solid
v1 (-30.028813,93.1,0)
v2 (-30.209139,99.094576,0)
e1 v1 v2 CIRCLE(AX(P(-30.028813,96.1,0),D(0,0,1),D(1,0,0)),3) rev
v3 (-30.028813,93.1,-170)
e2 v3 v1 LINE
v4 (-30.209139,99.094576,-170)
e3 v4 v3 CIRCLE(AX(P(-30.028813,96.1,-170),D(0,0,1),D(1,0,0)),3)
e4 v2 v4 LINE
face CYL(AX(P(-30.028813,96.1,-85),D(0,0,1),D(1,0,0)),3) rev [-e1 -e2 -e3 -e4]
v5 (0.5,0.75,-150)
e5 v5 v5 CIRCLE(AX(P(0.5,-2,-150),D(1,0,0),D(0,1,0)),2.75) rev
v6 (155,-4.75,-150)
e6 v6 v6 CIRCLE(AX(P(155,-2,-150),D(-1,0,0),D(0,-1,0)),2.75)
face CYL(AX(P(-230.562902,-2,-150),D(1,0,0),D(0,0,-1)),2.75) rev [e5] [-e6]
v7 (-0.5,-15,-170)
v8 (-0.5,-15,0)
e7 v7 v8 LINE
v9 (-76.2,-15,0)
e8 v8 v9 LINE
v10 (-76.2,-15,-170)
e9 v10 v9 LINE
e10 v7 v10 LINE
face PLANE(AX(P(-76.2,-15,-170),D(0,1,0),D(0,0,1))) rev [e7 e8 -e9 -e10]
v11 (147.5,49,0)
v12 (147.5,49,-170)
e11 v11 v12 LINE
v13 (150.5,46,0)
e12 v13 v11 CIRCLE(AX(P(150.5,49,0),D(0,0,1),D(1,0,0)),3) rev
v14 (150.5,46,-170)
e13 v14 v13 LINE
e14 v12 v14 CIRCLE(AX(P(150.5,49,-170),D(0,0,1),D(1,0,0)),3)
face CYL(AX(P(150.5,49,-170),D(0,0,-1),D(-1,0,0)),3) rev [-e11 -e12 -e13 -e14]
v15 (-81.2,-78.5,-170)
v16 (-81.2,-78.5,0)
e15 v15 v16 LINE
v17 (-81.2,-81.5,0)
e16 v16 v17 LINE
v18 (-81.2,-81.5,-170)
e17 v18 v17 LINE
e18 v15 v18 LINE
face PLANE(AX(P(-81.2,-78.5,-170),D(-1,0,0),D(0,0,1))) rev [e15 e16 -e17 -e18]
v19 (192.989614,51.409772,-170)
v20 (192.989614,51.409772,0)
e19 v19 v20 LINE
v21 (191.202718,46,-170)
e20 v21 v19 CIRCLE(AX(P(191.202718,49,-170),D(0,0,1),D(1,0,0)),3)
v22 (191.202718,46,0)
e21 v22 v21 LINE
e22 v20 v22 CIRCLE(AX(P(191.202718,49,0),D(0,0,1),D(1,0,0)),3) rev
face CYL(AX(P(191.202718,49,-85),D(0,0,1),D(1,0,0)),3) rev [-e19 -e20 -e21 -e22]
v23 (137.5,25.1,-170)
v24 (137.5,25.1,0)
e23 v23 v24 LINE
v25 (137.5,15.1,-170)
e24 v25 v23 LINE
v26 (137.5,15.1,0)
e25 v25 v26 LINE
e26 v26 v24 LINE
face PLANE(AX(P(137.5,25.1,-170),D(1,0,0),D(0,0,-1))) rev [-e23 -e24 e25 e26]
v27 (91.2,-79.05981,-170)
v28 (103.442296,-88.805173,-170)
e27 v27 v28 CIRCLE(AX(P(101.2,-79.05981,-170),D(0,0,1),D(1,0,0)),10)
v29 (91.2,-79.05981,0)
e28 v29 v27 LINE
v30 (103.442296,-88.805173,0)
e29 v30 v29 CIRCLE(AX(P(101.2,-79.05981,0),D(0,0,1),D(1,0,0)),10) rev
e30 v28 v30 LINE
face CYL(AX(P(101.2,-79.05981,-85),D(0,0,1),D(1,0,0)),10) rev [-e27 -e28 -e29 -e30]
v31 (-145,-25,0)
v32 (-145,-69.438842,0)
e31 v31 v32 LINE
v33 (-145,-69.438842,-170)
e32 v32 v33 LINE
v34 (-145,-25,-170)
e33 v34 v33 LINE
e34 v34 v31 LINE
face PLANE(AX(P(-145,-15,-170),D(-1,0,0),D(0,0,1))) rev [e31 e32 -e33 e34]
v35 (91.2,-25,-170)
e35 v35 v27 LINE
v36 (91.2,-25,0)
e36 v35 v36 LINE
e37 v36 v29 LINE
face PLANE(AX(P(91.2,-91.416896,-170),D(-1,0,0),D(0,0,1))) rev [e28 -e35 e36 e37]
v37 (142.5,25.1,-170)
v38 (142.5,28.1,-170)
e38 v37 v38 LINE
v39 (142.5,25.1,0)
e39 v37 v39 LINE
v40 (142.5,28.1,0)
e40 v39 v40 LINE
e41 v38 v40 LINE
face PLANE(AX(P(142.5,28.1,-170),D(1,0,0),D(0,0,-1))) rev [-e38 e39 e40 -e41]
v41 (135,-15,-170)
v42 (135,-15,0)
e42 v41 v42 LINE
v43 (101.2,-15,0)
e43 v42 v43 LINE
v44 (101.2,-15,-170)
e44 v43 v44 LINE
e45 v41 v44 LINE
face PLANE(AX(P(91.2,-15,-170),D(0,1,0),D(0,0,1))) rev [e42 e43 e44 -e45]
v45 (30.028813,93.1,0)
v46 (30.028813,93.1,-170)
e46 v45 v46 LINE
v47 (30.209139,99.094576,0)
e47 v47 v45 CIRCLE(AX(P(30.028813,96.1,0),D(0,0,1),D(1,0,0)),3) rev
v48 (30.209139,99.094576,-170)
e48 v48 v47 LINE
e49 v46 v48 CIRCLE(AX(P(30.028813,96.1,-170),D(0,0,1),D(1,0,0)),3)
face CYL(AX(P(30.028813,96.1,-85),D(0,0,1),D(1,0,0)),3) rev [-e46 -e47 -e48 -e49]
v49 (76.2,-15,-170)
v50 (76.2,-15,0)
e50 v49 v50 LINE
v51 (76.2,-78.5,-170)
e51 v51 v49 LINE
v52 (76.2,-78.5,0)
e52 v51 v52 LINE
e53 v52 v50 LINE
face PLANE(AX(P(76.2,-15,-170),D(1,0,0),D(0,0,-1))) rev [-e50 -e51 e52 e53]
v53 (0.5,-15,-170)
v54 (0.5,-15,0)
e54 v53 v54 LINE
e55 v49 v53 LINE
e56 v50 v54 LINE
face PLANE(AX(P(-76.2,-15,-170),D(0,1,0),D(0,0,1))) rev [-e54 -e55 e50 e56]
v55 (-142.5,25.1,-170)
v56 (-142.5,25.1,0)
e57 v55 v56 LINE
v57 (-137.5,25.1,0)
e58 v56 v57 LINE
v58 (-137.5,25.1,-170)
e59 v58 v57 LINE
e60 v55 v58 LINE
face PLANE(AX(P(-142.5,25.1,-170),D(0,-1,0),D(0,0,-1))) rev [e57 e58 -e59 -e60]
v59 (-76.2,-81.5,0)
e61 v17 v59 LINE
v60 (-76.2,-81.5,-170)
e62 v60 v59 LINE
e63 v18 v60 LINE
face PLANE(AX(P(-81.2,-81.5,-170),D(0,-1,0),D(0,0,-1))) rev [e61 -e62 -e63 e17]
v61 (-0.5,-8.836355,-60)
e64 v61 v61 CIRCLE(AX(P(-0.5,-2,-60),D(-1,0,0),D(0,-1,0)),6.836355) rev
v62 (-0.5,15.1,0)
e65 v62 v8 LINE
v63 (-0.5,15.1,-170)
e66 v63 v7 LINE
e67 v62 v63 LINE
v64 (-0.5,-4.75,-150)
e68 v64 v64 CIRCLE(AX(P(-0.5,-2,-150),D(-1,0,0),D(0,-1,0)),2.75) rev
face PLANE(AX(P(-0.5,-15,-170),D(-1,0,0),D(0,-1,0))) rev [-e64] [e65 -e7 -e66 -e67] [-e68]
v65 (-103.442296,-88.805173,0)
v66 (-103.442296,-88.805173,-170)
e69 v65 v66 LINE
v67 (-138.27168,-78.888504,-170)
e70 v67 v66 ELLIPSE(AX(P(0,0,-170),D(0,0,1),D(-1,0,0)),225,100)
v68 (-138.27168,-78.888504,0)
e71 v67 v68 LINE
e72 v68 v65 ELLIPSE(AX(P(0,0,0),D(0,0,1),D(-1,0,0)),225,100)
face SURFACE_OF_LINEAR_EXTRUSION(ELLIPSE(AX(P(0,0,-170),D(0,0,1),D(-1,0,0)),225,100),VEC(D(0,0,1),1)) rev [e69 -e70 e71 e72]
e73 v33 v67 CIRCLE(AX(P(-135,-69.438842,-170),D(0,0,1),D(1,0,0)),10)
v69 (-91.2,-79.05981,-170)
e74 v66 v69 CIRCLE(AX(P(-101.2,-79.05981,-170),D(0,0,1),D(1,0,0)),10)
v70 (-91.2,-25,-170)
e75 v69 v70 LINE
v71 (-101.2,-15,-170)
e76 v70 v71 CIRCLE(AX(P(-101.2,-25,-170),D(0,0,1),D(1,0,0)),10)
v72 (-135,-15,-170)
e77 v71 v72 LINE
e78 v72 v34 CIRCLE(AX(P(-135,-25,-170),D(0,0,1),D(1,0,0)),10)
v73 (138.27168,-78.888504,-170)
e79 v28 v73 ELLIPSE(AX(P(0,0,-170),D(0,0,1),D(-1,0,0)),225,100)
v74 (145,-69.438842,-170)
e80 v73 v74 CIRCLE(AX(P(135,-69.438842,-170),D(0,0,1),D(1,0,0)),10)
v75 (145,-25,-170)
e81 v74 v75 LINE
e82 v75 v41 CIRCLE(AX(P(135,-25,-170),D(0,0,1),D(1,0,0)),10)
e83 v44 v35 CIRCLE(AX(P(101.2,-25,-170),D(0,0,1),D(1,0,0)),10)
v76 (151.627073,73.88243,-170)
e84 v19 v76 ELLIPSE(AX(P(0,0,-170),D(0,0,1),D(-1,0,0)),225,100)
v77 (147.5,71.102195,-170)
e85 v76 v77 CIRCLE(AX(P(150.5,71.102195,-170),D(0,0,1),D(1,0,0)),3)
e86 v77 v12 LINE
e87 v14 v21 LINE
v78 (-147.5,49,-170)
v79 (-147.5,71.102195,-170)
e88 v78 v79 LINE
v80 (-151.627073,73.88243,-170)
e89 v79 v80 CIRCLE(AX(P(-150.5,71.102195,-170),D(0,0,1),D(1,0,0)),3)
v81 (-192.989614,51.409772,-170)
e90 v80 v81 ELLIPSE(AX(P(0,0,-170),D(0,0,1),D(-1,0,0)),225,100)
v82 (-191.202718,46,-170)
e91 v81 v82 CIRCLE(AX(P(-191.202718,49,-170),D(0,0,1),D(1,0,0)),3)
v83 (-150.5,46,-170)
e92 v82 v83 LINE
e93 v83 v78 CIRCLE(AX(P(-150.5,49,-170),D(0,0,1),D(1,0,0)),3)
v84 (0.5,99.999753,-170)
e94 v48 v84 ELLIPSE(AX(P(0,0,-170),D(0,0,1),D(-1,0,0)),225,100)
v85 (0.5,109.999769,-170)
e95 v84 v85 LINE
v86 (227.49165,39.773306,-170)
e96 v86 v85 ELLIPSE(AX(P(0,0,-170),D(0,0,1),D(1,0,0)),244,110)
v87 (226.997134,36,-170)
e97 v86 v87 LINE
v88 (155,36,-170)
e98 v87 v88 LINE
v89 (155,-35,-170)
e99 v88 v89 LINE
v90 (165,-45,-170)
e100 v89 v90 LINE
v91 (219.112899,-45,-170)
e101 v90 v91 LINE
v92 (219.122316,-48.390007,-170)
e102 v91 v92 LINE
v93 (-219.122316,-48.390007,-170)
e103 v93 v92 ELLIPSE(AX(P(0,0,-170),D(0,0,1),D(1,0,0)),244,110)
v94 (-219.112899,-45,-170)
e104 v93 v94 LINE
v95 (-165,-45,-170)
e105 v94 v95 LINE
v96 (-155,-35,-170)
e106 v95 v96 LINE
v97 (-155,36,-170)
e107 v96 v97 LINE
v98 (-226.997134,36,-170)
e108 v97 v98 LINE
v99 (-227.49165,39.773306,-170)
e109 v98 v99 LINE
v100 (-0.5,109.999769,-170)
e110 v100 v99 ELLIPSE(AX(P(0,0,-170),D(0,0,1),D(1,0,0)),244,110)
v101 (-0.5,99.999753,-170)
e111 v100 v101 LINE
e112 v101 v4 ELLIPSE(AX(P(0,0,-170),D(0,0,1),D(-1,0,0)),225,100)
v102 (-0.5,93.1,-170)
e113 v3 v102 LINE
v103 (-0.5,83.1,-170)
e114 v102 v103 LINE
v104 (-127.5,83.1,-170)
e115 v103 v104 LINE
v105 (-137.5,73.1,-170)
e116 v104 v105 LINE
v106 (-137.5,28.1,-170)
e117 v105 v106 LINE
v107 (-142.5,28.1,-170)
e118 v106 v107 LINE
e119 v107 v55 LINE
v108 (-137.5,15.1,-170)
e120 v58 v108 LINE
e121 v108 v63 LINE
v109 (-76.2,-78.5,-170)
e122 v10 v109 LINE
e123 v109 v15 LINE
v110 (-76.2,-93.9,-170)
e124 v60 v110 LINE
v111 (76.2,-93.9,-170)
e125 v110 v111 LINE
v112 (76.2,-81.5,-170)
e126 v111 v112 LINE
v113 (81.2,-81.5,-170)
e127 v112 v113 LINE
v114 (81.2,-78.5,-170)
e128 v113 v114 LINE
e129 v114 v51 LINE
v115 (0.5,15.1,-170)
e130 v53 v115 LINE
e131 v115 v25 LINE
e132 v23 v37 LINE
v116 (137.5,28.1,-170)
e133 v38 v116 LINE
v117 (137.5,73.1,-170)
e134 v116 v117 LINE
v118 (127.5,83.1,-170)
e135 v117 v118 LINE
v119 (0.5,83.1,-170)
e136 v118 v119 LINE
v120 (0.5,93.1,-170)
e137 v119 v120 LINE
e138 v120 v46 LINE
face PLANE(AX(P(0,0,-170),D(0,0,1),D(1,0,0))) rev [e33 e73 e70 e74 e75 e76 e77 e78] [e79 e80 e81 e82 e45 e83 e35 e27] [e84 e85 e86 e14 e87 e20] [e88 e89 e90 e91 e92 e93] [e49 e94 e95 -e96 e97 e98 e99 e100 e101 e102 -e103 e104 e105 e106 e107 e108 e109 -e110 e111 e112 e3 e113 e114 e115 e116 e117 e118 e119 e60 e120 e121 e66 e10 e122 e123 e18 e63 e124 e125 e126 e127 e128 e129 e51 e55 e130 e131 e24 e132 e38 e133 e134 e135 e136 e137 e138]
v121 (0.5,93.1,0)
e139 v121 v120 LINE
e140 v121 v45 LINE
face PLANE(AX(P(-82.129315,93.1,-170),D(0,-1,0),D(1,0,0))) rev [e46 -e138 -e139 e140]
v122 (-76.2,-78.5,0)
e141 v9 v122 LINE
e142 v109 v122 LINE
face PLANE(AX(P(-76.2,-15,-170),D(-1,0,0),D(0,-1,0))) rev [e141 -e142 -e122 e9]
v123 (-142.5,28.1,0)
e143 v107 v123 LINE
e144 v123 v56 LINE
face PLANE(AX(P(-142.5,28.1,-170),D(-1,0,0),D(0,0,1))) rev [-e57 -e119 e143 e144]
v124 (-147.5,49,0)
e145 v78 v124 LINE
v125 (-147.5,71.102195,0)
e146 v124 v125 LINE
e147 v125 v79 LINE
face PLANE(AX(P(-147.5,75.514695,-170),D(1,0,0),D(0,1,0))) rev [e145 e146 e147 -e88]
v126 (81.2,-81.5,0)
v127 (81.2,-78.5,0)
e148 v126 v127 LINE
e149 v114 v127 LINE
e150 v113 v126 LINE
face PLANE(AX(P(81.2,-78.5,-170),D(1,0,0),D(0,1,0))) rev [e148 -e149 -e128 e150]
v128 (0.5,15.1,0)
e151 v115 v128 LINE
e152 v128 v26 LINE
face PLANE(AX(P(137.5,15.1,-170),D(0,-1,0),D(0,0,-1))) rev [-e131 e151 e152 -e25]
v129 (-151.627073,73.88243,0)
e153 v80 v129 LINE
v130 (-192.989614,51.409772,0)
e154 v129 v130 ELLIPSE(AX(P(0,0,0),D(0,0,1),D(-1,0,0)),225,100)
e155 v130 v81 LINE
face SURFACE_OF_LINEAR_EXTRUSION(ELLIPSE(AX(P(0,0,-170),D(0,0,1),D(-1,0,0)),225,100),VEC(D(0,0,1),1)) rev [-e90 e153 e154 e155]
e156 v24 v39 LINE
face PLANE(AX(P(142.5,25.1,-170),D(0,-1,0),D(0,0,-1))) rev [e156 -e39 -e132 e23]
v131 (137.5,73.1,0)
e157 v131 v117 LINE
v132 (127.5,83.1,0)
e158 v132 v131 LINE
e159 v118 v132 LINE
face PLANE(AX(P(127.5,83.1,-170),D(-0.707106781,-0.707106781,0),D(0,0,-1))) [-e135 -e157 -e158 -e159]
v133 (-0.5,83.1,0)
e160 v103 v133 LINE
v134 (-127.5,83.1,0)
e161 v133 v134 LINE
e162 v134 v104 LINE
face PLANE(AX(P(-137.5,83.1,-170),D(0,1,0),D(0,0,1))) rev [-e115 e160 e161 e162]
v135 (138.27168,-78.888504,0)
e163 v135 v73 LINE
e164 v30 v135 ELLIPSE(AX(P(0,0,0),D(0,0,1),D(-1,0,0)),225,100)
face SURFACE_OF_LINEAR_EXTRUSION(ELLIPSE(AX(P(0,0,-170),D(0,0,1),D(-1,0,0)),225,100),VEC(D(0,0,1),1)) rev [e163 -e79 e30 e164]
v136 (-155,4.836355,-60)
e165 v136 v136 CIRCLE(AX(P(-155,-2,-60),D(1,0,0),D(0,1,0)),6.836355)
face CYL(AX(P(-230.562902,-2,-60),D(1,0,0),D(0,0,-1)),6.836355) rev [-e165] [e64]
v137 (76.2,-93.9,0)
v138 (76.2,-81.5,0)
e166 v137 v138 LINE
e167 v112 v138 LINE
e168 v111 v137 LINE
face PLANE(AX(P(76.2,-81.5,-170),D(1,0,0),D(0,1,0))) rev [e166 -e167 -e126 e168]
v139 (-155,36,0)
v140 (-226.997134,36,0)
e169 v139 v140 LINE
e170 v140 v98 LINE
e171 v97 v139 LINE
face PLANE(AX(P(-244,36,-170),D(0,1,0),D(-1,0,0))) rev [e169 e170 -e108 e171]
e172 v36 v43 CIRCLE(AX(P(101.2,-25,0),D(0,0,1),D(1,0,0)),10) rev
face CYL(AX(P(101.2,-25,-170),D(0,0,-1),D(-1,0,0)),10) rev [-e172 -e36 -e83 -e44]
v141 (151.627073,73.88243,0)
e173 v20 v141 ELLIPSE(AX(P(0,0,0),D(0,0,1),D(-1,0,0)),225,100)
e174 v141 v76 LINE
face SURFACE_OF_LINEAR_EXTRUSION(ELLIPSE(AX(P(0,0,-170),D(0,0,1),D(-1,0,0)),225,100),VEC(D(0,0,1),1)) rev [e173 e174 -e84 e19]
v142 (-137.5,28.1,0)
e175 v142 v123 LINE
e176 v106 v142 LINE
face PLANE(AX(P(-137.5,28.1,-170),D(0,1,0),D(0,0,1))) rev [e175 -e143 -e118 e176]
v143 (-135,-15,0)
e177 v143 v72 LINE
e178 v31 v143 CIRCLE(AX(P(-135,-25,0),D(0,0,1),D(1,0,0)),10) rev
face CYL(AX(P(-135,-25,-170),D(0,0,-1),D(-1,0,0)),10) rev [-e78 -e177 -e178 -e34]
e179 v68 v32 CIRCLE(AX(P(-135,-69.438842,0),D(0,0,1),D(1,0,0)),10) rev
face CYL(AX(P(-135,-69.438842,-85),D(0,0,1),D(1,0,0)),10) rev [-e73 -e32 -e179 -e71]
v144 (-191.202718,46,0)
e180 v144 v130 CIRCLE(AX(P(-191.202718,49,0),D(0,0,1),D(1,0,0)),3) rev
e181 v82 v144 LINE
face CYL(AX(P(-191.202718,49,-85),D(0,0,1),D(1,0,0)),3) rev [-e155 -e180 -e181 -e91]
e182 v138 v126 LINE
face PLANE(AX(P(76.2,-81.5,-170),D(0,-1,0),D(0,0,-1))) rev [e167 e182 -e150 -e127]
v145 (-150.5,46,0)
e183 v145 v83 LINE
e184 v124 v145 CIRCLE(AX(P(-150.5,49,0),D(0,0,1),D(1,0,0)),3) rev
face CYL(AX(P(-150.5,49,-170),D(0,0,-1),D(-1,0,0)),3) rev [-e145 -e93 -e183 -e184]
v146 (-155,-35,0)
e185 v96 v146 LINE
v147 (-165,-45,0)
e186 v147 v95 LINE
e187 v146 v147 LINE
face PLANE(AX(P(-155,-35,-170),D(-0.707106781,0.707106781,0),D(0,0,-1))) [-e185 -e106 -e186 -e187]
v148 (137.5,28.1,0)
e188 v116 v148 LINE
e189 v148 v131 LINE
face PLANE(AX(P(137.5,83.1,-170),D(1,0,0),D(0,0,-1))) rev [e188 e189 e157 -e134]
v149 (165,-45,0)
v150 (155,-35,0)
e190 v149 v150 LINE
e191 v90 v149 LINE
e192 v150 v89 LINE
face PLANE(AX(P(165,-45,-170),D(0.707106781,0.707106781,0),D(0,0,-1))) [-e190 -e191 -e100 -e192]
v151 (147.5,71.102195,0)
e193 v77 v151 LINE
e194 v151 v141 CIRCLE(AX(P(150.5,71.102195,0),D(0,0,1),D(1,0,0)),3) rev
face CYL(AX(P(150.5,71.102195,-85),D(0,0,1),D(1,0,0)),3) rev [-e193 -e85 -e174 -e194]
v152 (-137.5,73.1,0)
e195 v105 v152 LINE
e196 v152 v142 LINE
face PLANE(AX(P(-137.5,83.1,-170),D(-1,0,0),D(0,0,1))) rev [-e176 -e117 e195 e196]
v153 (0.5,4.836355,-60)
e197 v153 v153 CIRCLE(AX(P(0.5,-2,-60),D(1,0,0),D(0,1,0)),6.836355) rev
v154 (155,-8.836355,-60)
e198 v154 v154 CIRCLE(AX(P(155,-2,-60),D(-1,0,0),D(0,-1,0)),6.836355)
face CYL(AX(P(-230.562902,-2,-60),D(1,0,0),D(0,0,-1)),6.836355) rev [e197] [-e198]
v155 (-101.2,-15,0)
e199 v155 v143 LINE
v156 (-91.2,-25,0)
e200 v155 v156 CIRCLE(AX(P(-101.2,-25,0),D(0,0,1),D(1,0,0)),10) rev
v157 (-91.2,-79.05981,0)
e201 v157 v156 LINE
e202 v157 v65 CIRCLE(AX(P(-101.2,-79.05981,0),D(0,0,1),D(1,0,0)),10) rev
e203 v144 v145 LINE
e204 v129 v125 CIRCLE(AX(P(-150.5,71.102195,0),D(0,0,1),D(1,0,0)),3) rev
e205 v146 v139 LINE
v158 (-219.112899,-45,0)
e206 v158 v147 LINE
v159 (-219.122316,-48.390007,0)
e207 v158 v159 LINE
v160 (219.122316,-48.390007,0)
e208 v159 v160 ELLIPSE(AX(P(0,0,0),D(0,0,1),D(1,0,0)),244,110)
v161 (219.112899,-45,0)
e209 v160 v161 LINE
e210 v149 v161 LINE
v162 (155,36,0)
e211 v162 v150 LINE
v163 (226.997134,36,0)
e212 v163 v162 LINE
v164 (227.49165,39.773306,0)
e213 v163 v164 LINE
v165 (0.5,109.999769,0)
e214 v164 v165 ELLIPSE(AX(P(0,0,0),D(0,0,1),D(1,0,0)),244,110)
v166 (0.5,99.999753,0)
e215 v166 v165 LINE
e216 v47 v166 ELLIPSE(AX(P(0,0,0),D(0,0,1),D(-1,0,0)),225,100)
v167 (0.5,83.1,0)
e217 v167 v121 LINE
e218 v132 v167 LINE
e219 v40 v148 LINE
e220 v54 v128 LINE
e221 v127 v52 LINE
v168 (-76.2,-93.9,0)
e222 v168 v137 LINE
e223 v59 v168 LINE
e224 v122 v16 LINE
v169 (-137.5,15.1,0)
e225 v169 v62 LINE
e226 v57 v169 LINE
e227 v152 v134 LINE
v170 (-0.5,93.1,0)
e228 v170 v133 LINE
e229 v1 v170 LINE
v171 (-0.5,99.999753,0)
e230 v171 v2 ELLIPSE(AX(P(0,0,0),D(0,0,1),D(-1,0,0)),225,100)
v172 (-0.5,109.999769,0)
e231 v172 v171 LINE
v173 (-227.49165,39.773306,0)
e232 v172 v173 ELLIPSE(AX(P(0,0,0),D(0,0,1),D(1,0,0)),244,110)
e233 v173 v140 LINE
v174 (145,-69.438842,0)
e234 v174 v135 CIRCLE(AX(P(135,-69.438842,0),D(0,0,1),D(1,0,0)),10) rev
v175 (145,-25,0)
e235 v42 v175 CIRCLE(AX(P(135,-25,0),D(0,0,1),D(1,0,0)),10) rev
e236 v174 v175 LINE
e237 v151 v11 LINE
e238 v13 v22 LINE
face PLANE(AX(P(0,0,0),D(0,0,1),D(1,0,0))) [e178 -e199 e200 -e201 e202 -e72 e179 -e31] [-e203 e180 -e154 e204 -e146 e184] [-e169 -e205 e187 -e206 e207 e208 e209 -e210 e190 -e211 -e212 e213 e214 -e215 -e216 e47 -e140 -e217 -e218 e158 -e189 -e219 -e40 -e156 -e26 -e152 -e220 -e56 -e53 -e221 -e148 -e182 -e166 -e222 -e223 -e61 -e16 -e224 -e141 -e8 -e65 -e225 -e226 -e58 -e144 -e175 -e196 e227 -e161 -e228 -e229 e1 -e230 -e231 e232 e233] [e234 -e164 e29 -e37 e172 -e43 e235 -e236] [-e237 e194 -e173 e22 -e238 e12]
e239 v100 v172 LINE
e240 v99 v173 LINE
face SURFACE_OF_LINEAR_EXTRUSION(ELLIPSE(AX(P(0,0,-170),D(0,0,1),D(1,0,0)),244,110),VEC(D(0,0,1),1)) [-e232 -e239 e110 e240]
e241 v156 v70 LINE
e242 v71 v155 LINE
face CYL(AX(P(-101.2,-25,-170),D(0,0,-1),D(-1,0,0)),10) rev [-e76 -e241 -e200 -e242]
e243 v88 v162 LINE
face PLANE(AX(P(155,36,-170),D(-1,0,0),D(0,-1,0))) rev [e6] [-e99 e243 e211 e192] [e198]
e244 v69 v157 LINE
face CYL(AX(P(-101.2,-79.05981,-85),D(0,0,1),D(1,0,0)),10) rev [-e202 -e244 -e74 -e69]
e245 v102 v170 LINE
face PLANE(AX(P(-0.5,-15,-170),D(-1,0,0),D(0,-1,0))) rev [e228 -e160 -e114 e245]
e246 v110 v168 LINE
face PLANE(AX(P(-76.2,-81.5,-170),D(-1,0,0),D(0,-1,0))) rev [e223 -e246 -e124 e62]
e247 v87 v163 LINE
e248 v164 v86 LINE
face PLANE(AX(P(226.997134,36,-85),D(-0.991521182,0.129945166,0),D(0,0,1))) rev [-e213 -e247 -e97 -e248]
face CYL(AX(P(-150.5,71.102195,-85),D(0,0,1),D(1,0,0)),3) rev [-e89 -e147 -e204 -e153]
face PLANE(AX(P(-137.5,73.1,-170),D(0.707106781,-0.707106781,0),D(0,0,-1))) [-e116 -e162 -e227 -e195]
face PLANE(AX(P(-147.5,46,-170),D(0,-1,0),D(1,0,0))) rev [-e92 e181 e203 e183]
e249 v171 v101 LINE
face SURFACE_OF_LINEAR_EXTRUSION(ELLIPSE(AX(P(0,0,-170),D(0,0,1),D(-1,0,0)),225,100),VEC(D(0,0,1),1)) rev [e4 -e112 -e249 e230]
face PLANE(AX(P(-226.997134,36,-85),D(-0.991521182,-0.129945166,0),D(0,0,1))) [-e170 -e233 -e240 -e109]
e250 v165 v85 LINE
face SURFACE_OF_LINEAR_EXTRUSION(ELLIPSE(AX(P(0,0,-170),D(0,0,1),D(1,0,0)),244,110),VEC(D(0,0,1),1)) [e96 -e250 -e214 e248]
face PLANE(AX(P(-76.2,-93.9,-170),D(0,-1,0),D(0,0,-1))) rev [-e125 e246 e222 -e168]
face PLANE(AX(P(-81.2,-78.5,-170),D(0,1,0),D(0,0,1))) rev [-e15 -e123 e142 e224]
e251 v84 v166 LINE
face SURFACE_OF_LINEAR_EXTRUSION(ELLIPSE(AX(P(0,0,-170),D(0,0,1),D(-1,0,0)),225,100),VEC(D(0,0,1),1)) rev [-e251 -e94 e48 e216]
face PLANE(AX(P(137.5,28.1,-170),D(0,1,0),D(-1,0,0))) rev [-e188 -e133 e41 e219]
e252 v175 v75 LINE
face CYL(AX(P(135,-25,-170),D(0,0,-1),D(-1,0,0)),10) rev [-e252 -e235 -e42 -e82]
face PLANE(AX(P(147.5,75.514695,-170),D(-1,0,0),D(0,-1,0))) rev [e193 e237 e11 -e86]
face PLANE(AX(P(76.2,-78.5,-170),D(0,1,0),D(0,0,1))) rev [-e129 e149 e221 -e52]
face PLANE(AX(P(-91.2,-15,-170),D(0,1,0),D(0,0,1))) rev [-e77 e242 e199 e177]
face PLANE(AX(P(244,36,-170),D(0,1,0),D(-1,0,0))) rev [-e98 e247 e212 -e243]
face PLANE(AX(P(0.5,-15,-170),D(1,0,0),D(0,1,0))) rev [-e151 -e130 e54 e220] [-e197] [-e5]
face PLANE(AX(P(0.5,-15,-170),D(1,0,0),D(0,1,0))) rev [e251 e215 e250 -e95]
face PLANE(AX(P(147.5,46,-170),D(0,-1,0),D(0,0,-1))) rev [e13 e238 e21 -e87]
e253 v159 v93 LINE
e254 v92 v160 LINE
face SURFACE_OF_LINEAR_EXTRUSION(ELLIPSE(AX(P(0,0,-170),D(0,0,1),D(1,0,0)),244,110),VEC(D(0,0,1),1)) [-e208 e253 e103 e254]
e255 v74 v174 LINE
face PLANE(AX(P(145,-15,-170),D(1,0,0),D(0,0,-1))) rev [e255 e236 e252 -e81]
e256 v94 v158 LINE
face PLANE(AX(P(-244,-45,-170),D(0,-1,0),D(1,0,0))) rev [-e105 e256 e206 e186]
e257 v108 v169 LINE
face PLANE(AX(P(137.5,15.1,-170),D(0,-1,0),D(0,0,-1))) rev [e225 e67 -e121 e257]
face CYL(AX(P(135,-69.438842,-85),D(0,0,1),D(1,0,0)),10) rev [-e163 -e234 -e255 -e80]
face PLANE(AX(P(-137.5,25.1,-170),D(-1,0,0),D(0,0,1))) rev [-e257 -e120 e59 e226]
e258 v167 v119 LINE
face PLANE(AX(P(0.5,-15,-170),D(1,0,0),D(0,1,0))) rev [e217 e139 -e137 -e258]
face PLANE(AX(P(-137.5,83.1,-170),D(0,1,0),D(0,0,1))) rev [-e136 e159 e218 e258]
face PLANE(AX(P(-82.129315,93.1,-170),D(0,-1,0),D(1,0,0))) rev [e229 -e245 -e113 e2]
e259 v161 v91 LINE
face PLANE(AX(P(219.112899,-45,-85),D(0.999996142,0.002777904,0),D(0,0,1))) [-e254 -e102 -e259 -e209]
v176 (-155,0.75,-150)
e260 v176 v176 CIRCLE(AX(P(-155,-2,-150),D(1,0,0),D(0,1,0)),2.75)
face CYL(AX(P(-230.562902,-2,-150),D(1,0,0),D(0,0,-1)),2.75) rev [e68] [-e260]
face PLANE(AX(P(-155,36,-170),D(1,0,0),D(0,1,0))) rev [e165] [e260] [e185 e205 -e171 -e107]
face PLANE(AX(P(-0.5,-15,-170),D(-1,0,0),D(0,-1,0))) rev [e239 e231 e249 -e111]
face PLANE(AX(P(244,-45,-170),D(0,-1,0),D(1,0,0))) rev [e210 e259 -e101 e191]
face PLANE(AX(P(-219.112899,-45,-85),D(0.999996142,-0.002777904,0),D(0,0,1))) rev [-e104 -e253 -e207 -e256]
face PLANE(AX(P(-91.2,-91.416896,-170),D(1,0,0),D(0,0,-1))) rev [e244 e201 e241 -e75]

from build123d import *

# Parameters (mm, degrees)
SKETCH1_RX              = 244
SKETCH1_RY              = 110
BOSS_EXTRUDE1_DEPTH     = 170
SKETCH9_W               = 89
SKETCH9_H               = 81
CUT_EXTRUDE4_DEPTH      = 318.074123826
CUT_EXTRUDE5_DEPTH      = 307.853795271
CUT_EXTRUDE6_DEPTH      = 307.853795271
CUT_EXTRUDE6_DEPTH_BACK = 307.853795271
SKETCH11_R              = 6.83635542
SKETCH11_R_2            = 2.75
CHAMFER1_START          = -171
CHAMFER1_DEPTH          = 172
CUT_EXTRUDE7_DEPTH      = 305.55287031
CHAMFER2_SIZE           = 10
CUT_EXTRUDE8_DEPTH      = 305.55287031
CUT_EXTRUDE8_DEPTH_BACK = 305.55287031
SKETCH14_W              = 1
SKETCH14_H              = 125
CUT_EXTRUDE9_DEPTH      = 305.55287044
CUT_EXTRUDE9_DEPTH_BACK = 305.55287044
FILLET1_R               = 10
FILLET2_R               = 3
CHAMFER4_SIZE           = 10


with BuildPart() as part:
    # Sketch1 → Boss-Extrude1 (new body)
    with BuildSketch(Plane.XY):
        with Locations((0, 0)):
            Ellipse(SKETCH1_RX, SKETCH1_RY)
    extrude(amount=-BOSS_EXTRUDE1_DEPTH)

    # Sketch9 → Cut-Extrude4 (cut, through all)
    with BuildSketch(Plane.XY):
        with Locations((199.5, -4.5)):
            Rectangle(SKETCH9_W, SKETCH9_H)
        with Locations((-199.5, -4.5)):
            Rectangle(SKETCH9_W, SKETCH9_H)
    extrude(amount=-CUT_EXTRUDE4_DEPTH, mode=Mode.SUBTRACT)

    # Sketch10 → Cut-Extrude5 (cut, through all)
    with BuildSketch(Plane.XY):
        Polygon((-137.5, 83.1), (137.5, 83.1), (137.5, 28.1), (142.5, 28.1), (142.5, 25.1), (137.5, 25.1), (137.5, 15.1), (-137.5, 15.1), (-137.5, 25.1), (-142.5, 25.1), (-142.5, 28.1), (-137.5, 28.1), align=None)
    extrude(amount=-CUT_EXTRUDE5_DEPTH, mode=Mode.SUBTRACT)

    # Sketch11 → Cut-Extrude6 (cut, two sides: drawn at the far end of the back side and taken through both)
    with BuildSketch(Plane(origin=(0, 0, 0), x_dir=(0, 0, -1), z_dir=(1, 0, 0)).offset(-CUT_EXTRUDE6_DEPTH_BACK)):
        with Locations(Location((60, -2, 0), (0, 0, 270))):
            Circle(SKETCH11_R)
        with Locations(Location((150, -2, 0), (0, 0, 270))):
            Circle(SKETCH11_R_2)
    extrude(amount=CUT_EXTRUDE6_DEPTH + CUT_EXTRUDE6_DEPTH_BACK, mode=Mode.SUBTRACT)

    # Chamfer1: read off the stored shape, not the designer's step
    # Chamfer1 outline → Chamfer1 (cut)
    with BuildSketch(Plane.XY.offset(CHAMFER1_START)):
        with BuildLine():
            add(Edge.make_bspline(
                [(230.562901548, 36), (229.103745792, 37.899303194), (227.491649987, 39.773306403)],
                knots=[0.33341591, 0.33341591, 0.33341591, 0.380657268, 0.380657268, 0.380657268], degree=2, weights=[1, 0.987158133, 0.974806549]))
            Line((227.491649987, 39.773306403), (226.997134148, 36))
            Line((226.997134148, 36), (230.562901548, 36))
        make_face()
        with BuildLine():
            Line((-226.997134148, 36), (-227.491649987, 39.773306403))
            add(Edge.make_bspline(
                [(-227.491649987, 39.773306403), (-229.103745792, 37.899303194), (-230.562901548, 36)],
                knots=[2.760935386, 2.760935386, 2.760935386, 2.808176743, 2.808176743, 2.808176743], degree=2, weights=[0.974806549, 0.987158133, 1]))
            Line((-230.562901548, 36), (-226.997134148, 36))
        make_face()
        with BuildLine():
            add(Edge.make_bspline(
                [(-222.648446162, -45), (-220.94937929, -46.708532895), (-219.122315767, -48.390007394)],
                knots=[3.563050222, 3.563050222, 3.563050222, 3.605462156, 3.605462156, 3.605462156], degree=2, weights=[1, 0.989097384, 0.978597088]))
            Line((-219.122315767, -48.390007394), (-219.112898615, -45))
            Line((-219.112898615, -45), (-222.648446162, -45))
        make_face()
        with BuildLine():
            Line((219.112898615, -45), (219.122315767, -48.390007394))
            add(Edge.make_bspline(
                [(219.122315767, -48.390007394), (220.94937929, -46.708532895), (222.648446162, -45)],
                knots=[5.819315805, 5.819315805, 5.819315805, 5.861727739, 5.861727739, 5.861727739], degree=2, weights=[0.978597088, 0.989097384, 1]))
            Line((222.648446162, -45), (219.112898615, -45))
        make_face()
    extrude(amount=CHAMFER1_DEPTH, mode=Mode.SUBTRACT)

    # Sketch13 → Cut-Extrude7 (cut, through all)
    with BuildSketch(Plane.XY):
        Polygon((-76.2, -81.5), (-76.2, -93.9), (76.2, -93.9), (76.2, -81.5), (81.2, -81.5), (81.2, -78.5), (76.2, -78.5), (76.2, -15), (-76.2, -15), (-76.2, -78.5), (-81.2, -78.5), (-81.2, -81.5), align=None)
    extrude(amount=-CUT_EXTRUDE7_DEPTH, mode=Mode.SUBTRACT)

    # Chamfer2
    chamfer2_edges = [part.edges().sort_by_distance(p)[0] for p in [
        (155, -45, -85),
        (-155, -45, -85),
    ]]
    chamfer(chamfer2_edges, length=CHAMFER2_SIZE)

    # Sketch14 → Cut-Extrude8 (cut, two sides: drawn at the far end of the back side and taken through both)
    with BuildSketch(Plane.XY.offset(-CUT_EXTRUDE8_DEPTH_BACK)):
        with Locations((0, 47.5)):
            Rectangle(SKETCH14_W, SKETCH14_H)
    extrude(amount=CUT_EXTRUDE8_DEPTH + CUT_EXTRUDE8_DEPTH_BACK, mode=Mode.SUBTRACT)

    # Sketch15 → Cut-Extrude9 (cut, two sides: drawn at the far end of the back side and taken through both)
    with BuildSketch(Plane.XY.offset(-CUT_EXTRUDE9_DEPTH_BACK)):
        with BuildLine():
            Line((147.5, 75.514694834), (147.5, 46))
            Line((147.5, 46), (199.781755924, 46))
            add(Edge.make_bspline(
                [(199.781755924, 46), (179.990233789, 62.979001801), (147.5, 75.514694834)],
                knots=[3.619587852, 3.619587852, 3.619587852, 3.997470903, 3.997470903, 3.997470903], degree=2, weights=[1, 0.982203587, 1]))
        make_face()
        with BuildLine():
            Line((91.2, -91.41689608), (91.2, -15))
            Line((91.2, -15), (145, -15))
            Line((145, -15), (145, -76.465113485))
            add(Edge.make_bspline(
                [(91.2, -91.41689608), (120.495747781, -85.643811522), (145, -76.465113485)],
                knots=[1.988139758, 1.988139758, 1.988139758, 2.27109284, 2.27109284, 2.27109284], degree=2, weights=[1, 0.990008876, 1]))
        make_face()
        with BuildLine():
            Line((-82.129314955, 93.1), (82.129314955, 93.1))
            add(Edge.make_bspline(
                [(82.129314955, 93.1), (0, 107.411385607), (-82.129314955, 93.1)],
                knots=[4.338735578, 4.338735578, 4.338735578, 5.086042382, 5.086042382, 5.086042382], degree=2, weights=[1, 0.931, 1]))
        make_face()
        with BuildLine():
            Line((-91.2, -91.41689608), (-91.2, -15))
            Line((-91.2, -15), (-145, -15))
            Line((-145, -15), (-145, -76.465113485))
            add(Edge.make_bspline(
                [(-145, -76.465113485), (-120.495747781, -85.643811522), (-91.2, -91.41689608)],
                knots=[0.870499814, 0.870499814, 0.870499814, 1.153452896, 1.153452896, 1.153452896], degree=2, weights=[1, 0.990008876, 1]))
        make_face()
        with BuildLine():
            Line((-147.5, 75.514694834), (-147.5, 46))
            Line((-147.5, 46), (-199.781755924, 46))
            add(Edge.make_bspline(
                [(-147.5, 75.514694834), (-179.990233789, 62.979001801), (-199.781755924, 46)],
                knots=[5.427307058, 5.427307058, 5.427307058, 5.805190109, 5.805190109, 5.805190109], degree=2, weights=[1, 0.982203587, 1]))
        make_face()
    extrude(amount=CUT_EXTRUDE9_DEPTH + CUT_EXTRUDE9_DEPTH_BACK, mode=Mode.SUBTRACT)

    # Fillet1
    fillet1_edges = [part.edges().sort_by_distance(p)[0] for p in [
        (-145, -15, -85),
        (-145, -76.465113485, -85),
        (-91.2, -91.41689608, -85),
        (145, -76.465113485, -85),
        (91.2, -91.41689608, -85),
        (91.2, -15, -85),
        (-91.2, -15, -85),
        (145, -15, -85),
    ]]
    fillet(fillet1_edges, radius=FILLET1_R)

    # Fillet2
    fillet2_edges = [part.edges().sort_by_distance(p)[0] for p in [
        (-82.129314955, 93.1, -85),
        (82.129314955, 93.1, -85),
        (199.781755924, 46, -85),
        (147.5, 75.514694834, -85),
        (147.5, 46, -85),
        (-147.5, 75.514694834, -85),
        (-147.5, 46, -85),
        (-199.781755924, 46, -85),
    ]]
    fillet(fillet2_edges, radius=FILLET2_R)

    # Chamfer4
    chamfer4_edges = [part.edges().sort_by_distance(p)[0] for p in [
        (-137.5, 83.1, -85),
        (137.5, 83.1, -85),
    ]]
    chamfer(chamfer4_edges, length=CHAMFER4_SIZE)


solid = part.part
